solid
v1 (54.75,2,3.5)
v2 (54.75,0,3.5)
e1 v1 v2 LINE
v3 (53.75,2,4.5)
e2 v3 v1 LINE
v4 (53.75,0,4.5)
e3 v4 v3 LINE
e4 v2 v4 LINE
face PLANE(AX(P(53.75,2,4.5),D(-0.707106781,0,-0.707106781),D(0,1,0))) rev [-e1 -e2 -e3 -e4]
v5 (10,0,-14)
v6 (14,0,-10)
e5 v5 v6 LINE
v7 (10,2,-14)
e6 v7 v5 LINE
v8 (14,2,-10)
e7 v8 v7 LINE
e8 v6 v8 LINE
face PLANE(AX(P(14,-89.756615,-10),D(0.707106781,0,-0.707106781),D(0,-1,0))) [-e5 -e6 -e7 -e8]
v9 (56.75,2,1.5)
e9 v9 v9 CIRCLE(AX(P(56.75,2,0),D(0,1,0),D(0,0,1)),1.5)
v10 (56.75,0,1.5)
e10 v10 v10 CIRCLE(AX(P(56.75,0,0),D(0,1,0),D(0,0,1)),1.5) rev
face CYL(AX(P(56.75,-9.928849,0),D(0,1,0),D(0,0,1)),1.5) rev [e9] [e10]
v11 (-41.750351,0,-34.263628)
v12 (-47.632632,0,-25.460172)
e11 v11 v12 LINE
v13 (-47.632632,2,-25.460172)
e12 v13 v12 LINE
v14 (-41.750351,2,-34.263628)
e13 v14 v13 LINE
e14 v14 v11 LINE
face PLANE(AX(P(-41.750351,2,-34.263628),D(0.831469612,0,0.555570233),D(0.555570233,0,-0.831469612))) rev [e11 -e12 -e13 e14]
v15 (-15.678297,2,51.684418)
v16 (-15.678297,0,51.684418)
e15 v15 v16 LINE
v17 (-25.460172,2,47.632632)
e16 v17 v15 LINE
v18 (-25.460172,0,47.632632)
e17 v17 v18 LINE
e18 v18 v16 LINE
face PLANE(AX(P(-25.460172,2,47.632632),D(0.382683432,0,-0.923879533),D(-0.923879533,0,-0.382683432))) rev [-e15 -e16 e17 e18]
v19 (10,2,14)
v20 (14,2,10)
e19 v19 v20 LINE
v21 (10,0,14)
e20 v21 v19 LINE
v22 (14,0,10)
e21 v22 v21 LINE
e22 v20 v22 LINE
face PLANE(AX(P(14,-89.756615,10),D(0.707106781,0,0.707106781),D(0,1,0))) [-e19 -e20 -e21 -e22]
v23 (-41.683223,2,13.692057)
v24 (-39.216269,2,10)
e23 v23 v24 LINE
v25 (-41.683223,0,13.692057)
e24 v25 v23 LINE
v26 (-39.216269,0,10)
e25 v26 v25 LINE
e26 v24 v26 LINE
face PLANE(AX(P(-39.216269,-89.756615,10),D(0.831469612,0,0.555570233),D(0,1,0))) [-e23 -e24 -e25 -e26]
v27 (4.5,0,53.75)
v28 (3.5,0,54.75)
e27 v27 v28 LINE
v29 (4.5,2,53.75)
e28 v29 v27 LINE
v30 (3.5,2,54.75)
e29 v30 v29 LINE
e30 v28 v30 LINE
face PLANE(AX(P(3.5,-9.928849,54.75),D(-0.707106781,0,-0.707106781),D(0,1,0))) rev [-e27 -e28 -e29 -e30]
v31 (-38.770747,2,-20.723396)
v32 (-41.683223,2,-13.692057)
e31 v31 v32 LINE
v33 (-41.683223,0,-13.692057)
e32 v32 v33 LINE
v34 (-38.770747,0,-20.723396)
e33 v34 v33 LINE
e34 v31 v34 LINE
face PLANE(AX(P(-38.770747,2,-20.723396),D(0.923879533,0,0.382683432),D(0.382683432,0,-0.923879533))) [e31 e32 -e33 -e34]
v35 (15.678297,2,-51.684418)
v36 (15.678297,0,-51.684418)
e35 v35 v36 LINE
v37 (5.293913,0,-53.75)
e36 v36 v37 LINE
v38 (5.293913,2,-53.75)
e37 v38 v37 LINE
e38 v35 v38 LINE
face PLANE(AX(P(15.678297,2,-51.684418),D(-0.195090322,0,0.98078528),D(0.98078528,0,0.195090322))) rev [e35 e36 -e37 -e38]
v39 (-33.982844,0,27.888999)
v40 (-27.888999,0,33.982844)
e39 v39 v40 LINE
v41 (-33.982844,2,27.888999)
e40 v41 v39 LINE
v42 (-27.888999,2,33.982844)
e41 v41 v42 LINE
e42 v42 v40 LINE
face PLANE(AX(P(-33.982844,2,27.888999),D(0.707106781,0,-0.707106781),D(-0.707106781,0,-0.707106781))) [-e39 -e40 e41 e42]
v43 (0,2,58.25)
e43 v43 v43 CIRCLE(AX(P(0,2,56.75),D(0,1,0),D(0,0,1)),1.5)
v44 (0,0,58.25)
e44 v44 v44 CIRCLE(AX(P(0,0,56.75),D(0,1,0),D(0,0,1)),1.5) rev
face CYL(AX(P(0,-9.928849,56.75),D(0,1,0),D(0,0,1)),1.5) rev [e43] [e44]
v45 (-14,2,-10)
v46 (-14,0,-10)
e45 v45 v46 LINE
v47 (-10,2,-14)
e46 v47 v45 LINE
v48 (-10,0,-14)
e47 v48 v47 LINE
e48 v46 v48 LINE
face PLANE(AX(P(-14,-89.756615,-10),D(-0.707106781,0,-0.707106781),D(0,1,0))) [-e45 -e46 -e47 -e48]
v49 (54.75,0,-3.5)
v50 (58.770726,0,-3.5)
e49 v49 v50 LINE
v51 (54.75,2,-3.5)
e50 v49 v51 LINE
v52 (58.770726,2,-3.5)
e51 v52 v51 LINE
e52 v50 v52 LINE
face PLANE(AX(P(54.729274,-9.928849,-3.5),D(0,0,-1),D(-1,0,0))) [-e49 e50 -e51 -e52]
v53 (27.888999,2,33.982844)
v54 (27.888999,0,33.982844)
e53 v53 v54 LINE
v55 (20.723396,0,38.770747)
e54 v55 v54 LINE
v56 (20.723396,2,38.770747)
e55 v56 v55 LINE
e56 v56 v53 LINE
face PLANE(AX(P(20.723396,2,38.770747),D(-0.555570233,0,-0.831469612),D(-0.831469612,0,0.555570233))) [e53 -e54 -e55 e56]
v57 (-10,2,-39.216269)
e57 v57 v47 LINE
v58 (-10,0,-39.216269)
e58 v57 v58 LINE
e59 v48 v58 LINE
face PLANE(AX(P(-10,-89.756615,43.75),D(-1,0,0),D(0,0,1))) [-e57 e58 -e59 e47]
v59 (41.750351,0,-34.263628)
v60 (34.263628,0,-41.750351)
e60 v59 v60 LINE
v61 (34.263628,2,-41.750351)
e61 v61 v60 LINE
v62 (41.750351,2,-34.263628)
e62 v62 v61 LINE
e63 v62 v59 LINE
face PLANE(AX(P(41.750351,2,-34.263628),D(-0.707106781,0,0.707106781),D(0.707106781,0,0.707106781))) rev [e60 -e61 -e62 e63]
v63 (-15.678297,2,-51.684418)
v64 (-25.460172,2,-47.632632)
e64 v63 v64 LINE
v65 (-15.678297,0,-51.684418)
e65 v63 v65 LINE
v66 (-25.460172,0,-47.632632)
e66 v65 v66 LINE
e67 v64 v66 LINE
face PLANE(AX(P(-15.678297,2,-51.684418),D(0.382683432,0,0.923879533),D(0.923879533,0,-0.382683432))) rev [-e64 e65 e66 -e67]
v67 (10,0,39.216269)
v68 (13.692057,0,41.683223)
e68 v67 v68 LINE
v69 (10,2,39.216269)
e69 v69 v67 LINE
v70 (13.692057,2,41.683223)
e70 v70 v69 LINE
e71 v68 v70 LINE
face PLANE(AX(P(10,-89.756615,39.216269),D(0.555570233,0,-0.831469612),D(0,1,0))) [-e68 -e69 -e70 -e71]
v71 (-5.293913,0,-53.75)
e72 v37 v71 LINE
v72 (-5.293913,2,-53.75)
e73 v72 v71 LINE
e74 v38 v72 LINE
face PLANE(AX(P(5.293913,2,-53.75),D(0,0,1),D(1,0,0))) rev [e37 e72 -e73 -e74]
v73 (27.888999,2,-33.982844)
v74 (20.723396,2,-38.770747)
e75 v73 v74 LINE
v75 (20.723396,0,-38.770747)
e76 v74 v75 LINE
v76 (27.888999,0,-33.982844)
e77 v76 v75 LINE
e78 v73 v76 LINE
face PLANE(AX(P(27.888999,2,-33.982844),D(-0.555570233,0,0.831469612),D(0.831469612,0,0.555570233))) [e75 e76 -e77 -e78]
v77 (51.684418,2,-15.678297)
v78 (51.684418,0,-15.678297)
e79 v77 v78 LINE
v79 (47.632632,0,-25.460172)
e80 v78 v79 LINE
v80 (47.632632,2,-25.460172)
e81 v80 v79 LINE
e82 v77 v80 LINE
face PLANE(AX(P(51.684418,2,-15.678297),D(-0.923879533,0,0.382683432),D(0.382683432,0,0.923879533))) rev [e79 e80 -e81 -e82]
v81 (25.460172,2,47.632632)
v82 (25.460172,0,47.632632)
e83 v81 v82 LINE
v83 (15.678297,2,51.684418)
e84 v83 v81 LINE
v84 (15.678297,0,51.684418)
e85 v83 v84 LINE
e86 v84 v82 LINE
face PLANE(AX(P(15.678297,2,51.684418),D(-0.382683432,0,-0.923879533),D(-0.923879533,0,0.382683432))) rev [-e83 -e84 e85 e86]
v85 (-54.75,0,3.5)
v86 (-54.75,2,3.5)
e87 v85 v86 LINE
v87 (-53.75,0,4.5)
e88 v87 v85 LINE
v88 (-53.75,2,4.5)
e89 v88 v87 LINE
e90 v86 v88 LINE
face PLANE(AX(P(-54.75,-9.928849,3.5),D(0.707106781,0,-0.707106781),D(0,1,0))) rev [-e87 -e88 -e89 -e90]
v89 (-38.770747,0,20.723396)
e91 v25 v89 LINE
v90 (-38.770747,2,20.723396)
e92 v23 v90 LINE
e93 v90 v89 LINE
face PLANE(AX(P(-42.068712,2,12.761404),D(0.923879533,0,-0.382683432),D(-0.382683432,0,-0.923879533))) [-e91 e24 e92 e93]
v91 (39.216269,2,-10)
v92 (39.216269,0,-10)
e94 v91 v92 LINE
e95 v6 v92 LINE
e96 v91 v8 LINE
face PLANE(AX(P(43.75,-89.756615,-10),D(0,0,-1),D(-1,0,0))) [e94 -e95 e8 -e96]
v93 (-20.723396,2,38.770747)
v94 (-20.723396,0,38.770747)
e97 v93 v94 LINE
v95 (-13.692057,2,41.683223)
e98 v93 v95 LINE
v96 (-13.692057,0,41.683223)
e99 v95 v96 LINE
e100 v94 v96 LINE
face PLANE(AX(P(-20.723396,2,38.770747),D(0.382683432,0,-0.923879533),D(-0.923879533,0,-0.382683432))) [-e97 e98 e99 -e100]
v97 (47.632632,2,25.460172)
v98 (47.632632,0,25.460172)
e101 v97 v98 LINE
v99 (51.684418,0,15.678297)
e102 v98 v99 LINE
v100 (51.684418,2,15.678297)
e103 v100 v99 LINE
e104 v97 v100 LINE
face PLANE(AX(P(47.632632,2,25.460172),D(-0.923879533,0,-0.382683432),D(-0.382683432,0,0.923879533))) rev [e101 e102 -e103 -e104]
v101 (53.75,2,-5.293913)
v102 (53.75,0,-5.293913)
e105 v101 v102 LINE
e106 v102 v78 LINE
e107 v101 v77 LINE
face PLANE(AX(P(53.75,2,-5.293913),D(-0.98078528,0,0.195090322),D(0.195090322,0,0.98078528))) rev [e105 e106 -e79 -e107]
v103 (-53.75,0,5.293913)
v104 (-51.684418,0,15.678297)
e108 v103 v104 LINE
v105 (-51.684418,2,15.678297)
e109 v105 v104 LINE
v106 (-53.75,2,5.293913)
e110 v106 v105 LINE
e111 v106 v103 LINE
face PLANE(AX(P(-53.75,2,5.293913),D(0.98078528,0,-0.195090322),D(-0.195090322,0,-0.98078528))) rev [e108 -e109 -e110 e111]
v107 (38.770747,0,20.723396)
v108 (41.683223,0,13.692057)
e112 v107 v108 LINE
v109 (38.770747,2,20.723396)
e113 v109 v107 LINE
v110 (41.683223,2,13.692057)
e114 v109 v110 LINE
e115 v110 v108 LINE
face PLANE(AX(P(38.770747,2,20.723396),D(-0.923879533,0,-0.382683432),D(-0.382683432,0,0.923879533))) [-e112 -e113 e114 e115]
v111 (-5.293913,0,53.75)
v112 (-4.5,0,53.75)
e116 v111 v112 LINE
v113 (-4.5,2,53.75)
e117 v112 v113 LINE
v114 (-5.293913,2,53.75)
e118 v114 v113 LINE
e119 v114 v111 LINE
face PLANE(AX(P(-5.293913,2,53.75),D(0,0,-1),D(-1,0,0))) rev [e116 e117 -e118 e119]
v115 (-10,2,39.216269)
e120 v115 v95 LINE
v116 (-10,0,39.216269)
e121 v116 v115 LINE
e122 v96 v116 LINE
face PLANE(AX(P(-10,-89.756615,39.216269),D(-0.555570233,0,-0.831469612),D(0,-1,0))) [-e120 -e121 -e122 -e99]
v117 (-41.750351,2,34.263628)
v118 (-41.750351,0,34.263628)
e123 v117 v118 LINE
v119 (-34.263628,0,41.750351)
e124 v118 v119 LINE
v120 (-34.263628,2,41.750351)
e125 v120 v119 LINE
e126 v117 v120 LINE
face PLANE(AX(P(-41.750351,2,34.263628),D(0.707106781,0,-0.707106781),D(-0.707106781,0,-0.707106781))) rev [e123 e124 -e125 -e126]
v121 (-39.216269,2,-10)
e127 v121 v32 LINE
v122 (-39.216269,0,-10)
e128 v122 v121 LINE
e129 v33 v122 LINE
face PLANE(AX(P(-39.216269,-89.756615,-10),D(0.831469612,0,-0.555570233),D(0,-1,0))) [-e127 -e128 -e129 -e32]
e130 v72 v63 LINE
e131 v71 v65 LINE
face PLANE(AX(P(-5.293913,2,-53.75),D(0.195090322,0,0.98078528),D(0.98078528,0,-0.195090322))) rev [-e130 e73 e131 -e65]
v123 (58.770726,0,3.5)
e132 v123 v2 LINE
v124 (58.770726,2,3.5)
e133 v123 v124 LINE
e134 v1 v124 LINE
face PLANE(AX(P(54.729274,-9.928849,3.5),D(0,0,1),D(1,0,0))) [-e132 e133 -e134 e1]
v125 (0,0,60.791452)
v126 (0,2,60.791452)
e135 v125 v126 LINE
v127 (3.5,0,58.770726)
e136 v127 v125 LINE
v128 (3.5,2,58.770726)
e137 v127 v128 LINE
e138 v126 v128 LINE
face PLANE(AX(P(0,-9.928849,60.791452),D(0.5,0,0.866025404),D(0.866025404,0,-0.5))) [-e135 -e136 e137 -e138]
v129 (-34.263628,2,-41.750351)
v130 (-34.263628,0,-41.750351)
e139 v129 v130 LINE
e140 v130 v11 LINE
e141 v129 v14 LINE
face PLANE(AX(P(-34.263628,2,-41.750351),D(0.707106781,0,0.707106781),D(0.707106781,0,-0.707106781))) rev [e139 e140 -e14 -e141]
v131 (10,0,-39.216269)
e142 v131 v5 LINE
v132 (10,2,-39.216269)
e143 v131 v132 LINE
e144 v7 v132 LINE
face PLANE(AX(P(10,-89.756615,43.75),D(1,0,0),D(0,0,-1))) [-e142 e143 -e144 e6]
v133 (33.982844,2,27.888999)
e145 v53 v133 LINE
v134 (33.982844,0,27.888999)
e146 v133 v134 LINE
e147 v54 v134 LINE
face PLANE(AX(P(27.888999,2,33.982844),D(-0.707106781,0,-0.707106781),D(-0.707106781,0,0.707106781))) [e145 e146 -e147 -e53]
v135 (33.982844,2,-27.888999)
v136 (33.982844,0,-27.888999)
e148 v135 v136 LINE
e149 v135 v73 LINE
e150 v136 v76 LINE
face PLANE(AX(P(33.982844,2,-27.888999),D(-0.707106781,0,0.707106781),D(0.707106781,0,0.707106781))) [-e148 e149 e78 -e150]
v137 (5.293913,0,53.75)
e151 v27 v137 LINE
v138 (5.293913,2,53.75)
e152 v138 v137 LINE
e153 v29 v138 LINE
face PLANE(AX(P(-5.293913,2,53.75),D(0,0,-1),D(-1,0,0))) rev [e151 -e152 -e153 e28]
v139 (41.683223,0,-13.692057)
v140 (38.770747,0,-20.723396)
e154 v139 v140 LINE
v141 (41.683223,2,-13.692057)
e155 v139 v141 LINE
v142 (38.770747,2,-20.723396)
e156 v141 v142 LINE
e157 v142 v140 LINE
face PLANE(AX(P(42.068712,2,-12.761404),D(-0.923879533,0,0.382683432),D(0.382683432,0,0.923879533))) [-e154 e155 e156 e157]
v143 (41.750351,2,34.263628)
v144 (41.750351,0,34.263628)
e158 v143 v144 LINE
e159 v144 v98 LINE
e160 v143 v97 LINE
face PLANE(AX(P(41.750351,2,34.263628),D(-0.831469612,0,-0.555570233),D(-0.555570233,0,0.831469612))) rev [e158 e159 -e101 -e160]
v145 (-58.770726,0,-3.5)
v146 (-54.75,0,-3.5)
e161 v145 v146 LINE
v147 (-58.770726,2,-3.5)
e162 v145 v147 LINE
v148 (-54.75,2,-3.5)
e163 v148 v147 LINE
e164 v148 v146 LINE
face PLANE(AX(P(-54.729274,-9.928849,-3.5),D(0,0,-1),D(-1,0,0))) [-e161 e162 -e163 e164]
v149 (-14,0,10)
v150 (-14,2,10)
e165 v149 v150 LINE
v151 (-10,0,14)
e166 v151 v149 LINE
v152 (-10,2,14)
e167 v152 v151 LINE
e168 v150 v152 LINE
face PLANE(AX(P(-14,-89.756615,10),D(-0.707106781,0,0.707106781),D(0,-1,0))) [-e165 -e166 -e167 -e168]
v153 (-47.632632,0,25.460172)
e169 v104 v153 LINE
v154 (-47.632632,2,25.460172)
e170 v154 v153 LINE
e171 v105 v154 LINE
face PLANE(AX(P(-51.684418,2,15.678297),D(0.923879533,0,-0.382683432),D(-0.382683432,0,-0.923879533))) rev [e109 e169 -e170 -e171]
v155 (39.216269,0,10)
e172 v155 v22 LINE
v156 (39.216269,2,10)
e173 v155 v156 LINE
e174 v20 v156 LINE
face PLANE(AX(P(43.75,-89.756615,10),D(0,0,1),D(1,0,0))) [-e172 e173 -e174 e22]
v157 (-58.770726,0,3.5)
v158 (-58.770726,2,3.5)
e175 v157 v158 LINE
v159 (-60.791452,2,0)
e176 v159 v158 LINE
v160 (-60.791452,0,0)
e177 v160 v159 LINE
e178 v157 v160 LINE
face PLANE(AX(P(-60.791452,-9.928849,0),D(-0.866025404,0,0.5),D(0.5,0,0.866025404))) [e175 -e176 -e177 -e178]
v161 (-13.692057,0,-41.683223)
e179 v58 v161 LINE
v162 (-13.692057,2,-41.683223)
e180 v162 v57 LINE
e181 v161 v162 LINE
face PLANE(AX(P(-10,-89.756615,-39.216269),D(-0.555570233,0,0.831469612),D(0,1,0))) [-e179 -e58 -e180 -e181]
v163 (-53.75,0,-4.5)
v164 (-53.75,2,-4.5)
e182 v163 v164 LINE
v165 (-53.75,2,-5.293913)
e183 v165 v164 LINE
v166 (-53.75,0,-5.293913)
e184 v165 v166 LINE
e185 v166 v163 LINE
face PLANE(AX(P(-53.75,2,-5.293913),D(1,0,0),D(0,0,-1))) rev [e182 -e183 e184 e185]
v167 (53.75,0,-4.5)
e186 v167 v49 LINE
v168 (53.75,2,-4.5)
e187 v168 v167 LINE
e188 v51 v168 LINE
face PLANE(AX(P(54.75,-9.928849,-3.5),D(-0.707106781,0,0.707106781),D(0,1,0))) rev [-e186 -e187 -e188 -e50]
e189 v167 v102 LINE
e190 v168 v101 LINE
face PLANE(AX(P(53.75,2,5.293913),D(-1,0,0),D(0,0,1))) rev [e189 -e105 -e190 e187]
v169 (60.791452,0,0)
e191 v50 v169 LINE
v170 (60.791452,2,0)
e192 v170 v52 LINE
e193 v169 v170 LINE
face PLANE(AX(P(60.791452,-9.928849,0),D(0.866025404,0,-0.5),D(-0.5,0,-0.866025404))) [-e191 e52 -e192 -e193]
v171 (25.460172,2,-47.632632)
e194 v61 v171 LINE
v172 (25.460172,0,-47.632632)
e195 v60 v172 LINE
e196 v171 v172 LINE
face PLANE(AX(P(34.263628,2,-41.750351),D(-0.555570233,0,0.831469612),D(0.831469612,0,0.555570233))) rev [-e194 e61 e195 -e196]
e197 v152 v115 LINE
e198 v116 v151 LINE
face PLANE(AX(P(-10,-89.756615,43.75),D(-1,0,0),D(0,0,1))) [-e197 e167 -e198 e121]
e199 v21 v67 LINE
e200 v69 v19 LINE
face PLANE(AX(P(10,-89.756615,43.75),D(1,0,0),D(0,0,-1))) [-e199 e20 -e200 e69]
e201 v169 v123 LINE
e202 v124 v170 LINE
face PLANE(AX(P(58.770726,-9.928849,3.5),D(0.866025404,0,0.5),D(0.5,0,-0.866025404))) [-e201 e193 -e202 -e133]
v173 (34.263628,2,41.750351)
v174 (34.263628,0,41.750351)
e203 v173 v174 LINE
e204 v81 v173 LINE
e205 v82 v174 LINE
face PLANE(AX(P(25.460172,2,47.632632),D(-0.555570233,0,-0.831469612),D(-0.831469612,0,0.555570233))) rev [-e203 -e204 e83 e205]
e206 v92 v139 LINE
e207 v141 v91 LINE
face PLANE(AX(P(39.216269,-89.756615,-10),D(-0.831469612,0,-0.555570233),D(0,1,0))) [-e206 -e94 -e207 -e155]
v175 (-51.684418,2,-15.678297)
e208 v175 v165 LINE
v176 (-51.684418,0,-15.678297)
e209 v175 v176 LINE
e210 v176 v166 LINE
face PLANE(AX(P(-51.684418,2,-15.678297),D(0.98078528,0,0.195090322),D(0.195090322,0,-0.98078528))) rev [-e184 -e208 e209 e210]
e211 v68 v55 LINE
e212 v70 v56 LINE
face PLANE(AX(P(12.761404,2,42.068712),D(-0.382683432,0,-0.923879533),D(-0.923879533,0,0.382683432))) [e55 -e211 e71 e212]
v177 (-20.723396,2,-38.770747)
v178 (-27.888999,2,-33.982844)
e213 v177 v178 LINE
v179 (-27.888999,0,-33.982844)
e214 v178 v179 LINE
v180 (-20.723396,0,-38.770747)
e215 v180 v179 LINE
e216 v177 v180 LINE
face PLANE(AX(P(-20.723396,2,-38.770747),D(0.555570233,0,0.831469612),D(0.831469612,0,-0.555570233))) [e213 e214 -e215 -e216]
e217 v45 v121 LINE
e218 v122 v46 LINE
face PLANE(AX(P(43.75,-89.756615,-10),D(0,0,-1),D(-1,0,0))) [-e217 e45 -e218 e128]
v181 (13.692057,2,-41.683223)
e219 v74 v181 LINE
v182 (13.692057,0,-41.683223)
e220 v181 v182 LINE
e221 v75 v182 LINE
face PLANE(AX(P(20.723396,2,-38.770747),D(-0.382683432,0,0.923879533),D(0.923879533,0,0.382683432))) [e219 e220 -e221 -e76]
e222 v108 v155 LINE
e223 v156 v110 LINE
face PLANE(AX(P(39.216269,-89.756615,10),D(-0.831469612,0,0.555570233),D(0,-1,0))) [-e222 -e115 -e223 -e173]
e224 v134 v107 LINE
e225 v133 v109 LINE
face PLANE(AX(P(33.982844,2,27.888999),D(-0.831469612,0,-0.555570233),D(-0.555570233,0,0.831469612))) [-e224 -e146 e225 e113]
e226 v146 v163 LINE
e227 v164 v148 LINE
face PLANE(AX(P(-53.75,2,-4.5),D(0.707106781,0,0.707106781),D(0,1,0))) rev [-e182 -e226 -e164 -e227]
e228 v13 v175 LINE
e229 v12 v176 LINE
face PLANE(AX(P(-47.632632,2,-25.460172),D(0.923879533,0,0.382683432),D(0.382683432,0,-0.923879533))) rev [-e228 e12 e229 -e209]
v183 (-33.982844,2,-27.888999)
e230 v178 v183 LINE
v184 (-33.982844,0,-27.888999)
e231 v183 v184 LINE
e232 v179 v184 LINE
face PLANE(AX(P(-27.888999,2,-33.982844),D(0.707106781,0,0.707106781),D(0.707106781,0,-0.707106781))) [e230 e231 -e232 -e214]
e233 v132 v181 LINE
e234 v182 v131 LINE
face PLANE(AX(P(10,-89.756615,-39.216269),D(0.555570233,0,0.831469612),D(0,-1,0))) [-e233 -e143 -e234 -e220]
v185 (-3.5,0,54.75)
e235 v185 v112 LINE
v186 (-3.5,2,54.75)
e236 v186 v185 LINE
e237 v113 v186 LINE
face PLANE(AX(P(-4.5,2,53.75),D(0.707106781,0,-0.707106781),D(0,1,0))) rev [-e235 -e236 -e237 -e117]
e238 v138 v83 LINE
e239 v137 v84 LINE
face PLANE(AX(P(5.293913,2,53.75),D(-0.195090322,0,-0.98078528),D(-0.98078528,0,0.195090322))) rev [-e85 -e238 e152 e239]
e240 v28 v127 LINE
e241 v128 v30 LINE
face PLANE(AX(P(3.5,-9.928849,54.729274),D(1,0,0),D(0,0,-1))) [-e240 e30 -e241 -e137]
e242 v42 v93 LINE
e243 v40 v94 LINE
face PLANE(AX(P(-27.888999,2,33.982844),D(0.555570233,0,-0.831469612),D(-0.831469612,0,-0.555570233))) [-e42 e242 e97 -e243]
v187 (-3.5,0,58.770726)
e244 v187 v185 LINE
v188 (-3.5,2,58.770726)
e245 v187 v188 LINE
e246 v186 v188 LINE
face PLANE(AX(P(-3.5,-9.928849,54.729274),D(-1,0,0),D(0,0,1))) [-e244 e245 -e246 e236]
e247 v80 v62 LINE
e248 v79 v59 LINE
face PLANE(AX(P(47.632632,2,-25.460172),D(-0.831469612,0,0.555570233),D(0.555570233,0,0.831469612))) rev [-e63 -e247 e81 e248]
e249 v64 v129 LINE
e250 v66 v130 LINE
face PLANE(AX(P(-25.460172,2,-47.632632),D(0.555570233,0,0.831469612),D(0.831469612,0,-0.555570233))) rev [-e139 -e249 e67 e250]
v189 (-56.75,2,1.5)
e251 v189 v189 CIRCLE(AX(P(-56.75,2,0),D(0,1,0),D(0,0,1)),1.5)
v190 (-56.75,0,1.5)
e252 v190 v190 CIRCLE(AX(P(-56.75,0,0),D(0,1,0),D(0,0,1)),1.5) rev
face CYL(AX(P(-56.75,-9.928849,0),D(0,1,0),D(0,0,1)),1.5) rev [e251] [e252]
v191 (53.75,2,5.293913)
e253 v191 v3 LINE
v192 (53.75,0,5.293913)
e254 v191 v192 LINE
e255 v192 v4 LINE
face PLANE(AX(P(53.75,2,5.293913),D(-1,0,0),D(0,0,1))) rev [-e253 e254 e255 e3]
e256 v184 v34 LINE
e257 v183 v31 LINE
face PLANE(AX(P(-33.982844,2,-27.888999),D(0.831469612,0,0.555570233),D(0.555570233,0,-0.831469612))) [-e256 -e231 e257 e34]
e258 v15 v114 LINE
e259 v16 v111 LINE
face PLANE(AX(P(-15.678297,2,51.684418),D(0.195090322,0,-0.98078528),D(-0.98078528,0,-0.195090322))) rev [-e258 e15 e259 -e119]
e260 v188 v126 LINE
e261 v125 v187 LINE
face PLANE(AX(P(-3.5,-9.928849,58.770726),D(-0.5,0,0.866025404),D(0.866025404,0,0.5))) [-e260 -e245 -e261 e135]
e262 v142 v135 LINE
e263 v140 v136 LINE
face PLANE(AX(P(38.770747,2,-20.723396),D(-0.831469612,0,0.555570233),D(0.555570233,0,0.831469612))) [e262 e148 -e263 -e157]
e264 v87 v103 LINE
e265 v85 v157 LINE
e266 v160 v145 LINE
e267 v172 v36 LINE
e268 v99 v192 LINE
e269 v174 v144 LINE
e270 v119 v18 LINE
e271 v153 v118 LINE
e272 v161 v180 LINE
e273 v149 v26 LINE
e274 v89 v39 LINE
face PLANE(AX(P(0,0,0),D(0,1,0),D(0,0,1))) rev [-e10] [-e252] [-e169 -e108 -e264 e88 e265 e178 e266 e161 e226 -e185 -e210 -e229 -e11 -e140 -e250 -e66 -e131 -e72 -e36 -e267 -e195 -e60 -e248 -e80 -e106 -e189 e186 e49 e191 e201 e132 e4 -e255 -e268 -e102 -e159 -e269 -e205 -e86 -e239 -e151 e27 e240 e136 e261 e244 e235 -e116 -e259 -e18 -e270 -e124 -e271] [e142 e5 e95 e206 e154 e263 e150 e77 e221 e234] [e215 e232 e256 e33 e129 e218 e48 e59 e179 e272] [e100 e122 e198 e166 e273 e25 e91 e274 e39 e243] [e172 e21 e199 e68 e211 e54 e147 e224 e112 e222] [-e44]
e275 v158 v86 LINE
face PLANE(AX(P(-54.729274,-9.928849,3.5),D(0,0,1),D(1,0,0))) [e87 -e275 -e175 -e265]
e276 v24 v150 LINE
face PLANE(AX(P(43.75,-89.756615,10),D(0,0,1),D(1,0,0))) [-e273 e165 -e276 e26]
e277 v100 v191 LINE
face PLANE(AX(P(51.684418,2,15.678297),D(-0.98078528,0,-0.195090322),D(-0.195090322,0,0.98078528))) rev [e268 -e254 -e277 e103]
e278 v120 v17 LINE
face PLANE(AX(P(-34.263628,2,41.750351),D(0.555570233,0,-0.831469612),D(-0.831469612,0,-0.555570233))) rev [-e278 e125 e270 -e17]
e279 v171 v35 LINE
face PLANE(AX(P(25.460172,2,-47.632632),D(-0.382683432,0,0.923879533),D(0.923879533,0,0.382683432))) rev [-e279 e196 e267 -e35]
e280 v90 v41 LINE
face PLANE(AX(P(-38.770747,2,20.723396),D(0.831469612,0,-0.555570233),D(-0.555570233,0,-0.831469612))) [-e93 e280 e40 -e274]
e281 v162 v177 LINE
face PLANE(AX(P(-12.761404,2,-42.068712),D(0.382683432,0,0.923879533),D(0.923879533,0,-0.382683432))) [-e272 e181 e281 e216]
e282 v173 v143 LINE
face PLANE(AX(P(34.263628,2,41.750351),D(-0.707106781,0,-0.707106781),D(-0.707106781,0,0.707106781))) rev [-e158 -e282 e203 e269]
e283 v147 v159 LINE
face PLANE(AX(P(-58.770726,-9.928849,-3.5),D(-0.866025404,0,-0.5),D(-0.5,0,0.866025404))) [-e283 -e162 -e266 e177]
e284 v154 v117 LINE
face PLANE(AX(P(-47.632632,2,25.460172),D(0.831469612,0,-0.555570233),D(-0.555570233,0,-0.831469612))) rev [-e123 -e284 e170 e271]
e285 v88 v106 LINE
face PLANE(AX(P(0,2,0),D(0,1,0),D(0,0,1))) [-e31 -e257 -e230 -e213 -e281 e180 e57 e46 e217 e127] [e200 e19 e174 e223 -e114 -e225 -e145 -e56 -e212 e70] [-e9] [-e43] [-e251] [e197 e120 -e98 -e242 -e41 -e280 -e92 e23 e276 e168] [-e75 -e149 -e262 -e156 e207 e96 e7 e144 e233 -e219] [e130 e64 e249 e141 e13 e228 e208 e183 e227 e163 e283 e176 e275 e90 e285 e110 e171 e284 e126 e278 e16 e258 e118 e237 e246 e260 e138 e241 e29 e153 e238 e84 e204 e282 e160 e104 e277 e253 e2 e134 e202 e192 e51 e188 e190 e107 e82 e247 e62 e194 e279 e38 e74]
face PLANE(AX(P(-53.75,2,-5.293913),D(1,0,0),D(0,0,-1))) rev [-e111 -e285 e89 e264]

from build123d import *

# Parameters (mm, degrees)
BOSS_EXTRUDE1_DEPTH = 2
SKETCH3_W           = 20
SKETCH3_H           = 87.5
BOSS_EXTRUDE4_DEPTH = 2
CIRPATTERN1_COUNT   = 2
CIRPATTERN1_ANGLE   = 90
CHAMFER1_DEPTH      = 2
SKETCH5_R           = 1.5
BOSS_EXTRUDE6_DEPTH = 2
CHAMFER3_SIZE       = 1


with BuildPart() as part:
    # Sketch1 → Boss-Extrude1 (new body)
    with BuildSketch(Plane(origin=(0, 0, 0), x_dir=(1, 0, 0), z_dir=(0, 1, 0))):
        Polygon((53.75, 5.29391293), (51.684417643, 15.678296686), (47.632632102, 25.460172293), (41.750351221, 34.263627757), (34.263627757, 41.750351221), (25.460172293, 47.632632102), (15.678296686, 51.684417643), (5.29391293, 53.75), (-5.29391293, 53.75), (-15.678296686, 51.684417643), (-25.460172293, 47.632632102), (-34.263627757, 41.750351221), (-41.750351221, 34.263627757), (-47.632632102, 25.460172293), (-51.684417643, 15.678296686), (-53.75, 5.29391293), (-53.75, -5.29391293), (-51.684417643, -15.678296686), (-47.632632102, -25.460172293), (-41.750351221, -34.263627757), (-34.263627757, -41.750351221), (-25.460172293, -47.632632102), (-15.678296686, -51.684417643), (-5.29391293, -53.75), (5.29391293, -53.75), (15.678296686, -51.684417643), (25.460172293, -47.632632102), (34.263627757, -41.750351221), (41.750351221, -34.263627757), (47.632632102, -25.460172293), (51.684417643, -15.678296686), (53.75, -5.29391293), align=None)
        Polygon((43.75, 4.308998897), (42.068712035, 12.76140428), (38.770747059, 20.723396052), (33.982844017, 27.888999337), (27.888999337, 33.982844017), (20.723396052, 38.770747059), (12.76140428, 42.068712035), (4.308998897, 43.75), (-4.308998897, 43.75), (-12.76140428, 42.068712035), (-20.723396052, 38.770747059), (-27.888999337, 33.982844017), (-33.982844017, 27.888999337), (-38.770747059, 20.723396052), (-42.068712035, 12.76140428), (-43.75, 4.308998897), (-43.75, -4.308998897), (-42.068712035, -12.76140428), (-38.770747059, -20.723396052), (-33.982844017, -27.888999337), (-27.888999337, -33.982844017), (-20.723396052, -38.770747059), (-12.76140428, -42.068712035), (-4.308998897, -43.75), (4.308998897, -43.75), (12.76140428, -42.068712035), (20.723396052, -38.770747059), (27.888999337, -33.982844017), (33.982844017, -27.888999337), (38.770747059, -20.723396052), (42.068712035, -12.76140428), (43.75, -4.308998897), align=None, mode=Mode.SUBTRACT)
    extrude(amount=BOSS_EXTRUDE1_DEPTH)

    # Sketch3 → Boss-Extrude4 (add)
    with BuildSketch(Plane(origin=(0, 2, 0), x_dir=(1, 0, 0), z_dir=(0, 1, 0))):
        Rectangle(SKETCH3_W, SKETCH3_H)
    boss_extrude4 = extrude(amount=-BOSS_EXTRUDE4_DEPTH)

    # CirPattern1: Boss-Extrude4 ×2 about axis
    cirpattern1_axis = Axis((0, 2, 0), (0, 1, 0))
    for i in range(1, CIRPATTERN1_COUNT):
        add(boss_extrude4.rotate(cirpattern1_axis, i * CIRPATTERN1_ANGLE / (CIRPATTERN1_COUNT - 1)))

    # Chamfer1: read off the stored shape, not the designer's step
    # Chamfer1 outline → Chamfer1 (add)
    with BuildSketch(Plane(origin=(0, 0, 0), x_dir=(1, 0, 0), z_dir=(0, 1, 0))):
        Polygon((10, -10), (10, -14), (14, -10), align=None)
        Polygon((13.692057296, -41.683222934), (10, -39.216269119), (10, -42.617989498), (12.76140428, -42.068712035), align=None)
        Polygon((42.617989498, -10), (39.216269119, -10), (41.683222934, -13.692057296), (42.068712035, -12.76140428), align=None)
        Polygon((-10, 10), (-10, 14), (-14, 10), align=None)
        Polygon((-13.692057296, 41.683222934), (-10, 39.216269119), (-10, 42.617989498), (-12.76140428, 42.068712035), align=None)
        Polygon((-42.617989498, 10), (-39.216269119, 10), (-41.683222934, 13.692057296), (-42.068712035, 12.76140428), align=None)
        Polygon((10, 10), (14, 10), (10, 14), align=None)
        Polygon((41.683222934, 13.692057296), (39.216269119, 10), (42.617989498, 10), (42.068712035, 12.76140428), align=None)
        Polygon((10, 42.617989498), (10, 39.216269119), (13.692057296, 41.683222934), (12.76140428, 42.068712035), align=None)
        Polygon((-10, -10), (-14, -10), (-10, -14), align=None)
        Polygon((-41.683222934, -13.692057296), (-39.216269119, -10), (-42.617989498, -10), (-42.068712035, -12.76140428), align=None)
        Polygon((-10, -42.617989498), (-10, -39.216269119), (-13.692057296, -41.683222934), (-12.76140428, -42.068712035), align=None)
    extrude(amount=CHAMFER1_DEPTH)

    # Sketch5 → Boss-Extrude6 (add)
    # profile 1 of 3: a face of its own
    with BuildSketch(Plane(origin=(0, 2, 0), x_dir=(1, 0, 0), z_dir=(0, 1, 0))):
        Polygon((-54.729274058, 3.5), (-58.770725942, 3.5), (-60.791451884, 0), (-58.770725942, -3.5), (-54.729274058, -3.5), (-53.75, -3.5), (-53.75, 3.5), align=None)
        with Locations(Location((-56.75, 0, 0), (0, 0, 270))):
            Circle(SKETCH5_R, mode=Mode.SUBTRACT)
    # profile 2 of 3: a face of its own
    with BuildSketch(Plane(origin=(0, 2, 0), x_dir=(1, 0, 0), z_dir=(0, 1, 0))):
        Polygon((54.729274058, 3.5), (53.75, 3.5), (53.75, -3.5), (54.729274058, -3.5), (58.770725942, -3.5), (60.791451884, 0), (58.770725942, 3.5), align=None)
        with Locations(Location((56.75, 0, 0), (0, 0, 270))):
            Circle(SKETCH5_R, mode=Mode.SUBTRACT)
    # profile 3 of 3: a face of its own
    with BuildSketch(Plane(origin=(0, 2, 0), x_dir=(1, 0, 0), z_dir=(0, 1, 0))):
        Polygon((3.5, -54.729274058), (3.5, -53.75), (-3.5, -53.75), (-3.5, -54.729274058), (-3.5, -58.770725942), (0, -60.791451884), (3.5, -58.770725942), align=None)
        with Locations(Location((0, -56.75, 0), (0, 0, 270))):
            Circle(SKETCH5_R, mode=Mode.SUBTRACT)
    extrude(amount=-BOSS_EXTRUDE6_DEPTH)

    # Chamfer3
    chamfer3_edges = [part.edges().sort_by_distance(p)[0] for p in [
        (-53.75, 1, 3.5),
        (-53.75, 1, -3.5),
        (53.75, 1, -3.5),
        (53.75, 1, 3.5),
        (3.5, 1, 53.75),
        (-3.5, 1, 53.75),
    ]]
    chamfer(chamfer3_edges, length=CHAMFER3_SIZE)


solid = part.part
